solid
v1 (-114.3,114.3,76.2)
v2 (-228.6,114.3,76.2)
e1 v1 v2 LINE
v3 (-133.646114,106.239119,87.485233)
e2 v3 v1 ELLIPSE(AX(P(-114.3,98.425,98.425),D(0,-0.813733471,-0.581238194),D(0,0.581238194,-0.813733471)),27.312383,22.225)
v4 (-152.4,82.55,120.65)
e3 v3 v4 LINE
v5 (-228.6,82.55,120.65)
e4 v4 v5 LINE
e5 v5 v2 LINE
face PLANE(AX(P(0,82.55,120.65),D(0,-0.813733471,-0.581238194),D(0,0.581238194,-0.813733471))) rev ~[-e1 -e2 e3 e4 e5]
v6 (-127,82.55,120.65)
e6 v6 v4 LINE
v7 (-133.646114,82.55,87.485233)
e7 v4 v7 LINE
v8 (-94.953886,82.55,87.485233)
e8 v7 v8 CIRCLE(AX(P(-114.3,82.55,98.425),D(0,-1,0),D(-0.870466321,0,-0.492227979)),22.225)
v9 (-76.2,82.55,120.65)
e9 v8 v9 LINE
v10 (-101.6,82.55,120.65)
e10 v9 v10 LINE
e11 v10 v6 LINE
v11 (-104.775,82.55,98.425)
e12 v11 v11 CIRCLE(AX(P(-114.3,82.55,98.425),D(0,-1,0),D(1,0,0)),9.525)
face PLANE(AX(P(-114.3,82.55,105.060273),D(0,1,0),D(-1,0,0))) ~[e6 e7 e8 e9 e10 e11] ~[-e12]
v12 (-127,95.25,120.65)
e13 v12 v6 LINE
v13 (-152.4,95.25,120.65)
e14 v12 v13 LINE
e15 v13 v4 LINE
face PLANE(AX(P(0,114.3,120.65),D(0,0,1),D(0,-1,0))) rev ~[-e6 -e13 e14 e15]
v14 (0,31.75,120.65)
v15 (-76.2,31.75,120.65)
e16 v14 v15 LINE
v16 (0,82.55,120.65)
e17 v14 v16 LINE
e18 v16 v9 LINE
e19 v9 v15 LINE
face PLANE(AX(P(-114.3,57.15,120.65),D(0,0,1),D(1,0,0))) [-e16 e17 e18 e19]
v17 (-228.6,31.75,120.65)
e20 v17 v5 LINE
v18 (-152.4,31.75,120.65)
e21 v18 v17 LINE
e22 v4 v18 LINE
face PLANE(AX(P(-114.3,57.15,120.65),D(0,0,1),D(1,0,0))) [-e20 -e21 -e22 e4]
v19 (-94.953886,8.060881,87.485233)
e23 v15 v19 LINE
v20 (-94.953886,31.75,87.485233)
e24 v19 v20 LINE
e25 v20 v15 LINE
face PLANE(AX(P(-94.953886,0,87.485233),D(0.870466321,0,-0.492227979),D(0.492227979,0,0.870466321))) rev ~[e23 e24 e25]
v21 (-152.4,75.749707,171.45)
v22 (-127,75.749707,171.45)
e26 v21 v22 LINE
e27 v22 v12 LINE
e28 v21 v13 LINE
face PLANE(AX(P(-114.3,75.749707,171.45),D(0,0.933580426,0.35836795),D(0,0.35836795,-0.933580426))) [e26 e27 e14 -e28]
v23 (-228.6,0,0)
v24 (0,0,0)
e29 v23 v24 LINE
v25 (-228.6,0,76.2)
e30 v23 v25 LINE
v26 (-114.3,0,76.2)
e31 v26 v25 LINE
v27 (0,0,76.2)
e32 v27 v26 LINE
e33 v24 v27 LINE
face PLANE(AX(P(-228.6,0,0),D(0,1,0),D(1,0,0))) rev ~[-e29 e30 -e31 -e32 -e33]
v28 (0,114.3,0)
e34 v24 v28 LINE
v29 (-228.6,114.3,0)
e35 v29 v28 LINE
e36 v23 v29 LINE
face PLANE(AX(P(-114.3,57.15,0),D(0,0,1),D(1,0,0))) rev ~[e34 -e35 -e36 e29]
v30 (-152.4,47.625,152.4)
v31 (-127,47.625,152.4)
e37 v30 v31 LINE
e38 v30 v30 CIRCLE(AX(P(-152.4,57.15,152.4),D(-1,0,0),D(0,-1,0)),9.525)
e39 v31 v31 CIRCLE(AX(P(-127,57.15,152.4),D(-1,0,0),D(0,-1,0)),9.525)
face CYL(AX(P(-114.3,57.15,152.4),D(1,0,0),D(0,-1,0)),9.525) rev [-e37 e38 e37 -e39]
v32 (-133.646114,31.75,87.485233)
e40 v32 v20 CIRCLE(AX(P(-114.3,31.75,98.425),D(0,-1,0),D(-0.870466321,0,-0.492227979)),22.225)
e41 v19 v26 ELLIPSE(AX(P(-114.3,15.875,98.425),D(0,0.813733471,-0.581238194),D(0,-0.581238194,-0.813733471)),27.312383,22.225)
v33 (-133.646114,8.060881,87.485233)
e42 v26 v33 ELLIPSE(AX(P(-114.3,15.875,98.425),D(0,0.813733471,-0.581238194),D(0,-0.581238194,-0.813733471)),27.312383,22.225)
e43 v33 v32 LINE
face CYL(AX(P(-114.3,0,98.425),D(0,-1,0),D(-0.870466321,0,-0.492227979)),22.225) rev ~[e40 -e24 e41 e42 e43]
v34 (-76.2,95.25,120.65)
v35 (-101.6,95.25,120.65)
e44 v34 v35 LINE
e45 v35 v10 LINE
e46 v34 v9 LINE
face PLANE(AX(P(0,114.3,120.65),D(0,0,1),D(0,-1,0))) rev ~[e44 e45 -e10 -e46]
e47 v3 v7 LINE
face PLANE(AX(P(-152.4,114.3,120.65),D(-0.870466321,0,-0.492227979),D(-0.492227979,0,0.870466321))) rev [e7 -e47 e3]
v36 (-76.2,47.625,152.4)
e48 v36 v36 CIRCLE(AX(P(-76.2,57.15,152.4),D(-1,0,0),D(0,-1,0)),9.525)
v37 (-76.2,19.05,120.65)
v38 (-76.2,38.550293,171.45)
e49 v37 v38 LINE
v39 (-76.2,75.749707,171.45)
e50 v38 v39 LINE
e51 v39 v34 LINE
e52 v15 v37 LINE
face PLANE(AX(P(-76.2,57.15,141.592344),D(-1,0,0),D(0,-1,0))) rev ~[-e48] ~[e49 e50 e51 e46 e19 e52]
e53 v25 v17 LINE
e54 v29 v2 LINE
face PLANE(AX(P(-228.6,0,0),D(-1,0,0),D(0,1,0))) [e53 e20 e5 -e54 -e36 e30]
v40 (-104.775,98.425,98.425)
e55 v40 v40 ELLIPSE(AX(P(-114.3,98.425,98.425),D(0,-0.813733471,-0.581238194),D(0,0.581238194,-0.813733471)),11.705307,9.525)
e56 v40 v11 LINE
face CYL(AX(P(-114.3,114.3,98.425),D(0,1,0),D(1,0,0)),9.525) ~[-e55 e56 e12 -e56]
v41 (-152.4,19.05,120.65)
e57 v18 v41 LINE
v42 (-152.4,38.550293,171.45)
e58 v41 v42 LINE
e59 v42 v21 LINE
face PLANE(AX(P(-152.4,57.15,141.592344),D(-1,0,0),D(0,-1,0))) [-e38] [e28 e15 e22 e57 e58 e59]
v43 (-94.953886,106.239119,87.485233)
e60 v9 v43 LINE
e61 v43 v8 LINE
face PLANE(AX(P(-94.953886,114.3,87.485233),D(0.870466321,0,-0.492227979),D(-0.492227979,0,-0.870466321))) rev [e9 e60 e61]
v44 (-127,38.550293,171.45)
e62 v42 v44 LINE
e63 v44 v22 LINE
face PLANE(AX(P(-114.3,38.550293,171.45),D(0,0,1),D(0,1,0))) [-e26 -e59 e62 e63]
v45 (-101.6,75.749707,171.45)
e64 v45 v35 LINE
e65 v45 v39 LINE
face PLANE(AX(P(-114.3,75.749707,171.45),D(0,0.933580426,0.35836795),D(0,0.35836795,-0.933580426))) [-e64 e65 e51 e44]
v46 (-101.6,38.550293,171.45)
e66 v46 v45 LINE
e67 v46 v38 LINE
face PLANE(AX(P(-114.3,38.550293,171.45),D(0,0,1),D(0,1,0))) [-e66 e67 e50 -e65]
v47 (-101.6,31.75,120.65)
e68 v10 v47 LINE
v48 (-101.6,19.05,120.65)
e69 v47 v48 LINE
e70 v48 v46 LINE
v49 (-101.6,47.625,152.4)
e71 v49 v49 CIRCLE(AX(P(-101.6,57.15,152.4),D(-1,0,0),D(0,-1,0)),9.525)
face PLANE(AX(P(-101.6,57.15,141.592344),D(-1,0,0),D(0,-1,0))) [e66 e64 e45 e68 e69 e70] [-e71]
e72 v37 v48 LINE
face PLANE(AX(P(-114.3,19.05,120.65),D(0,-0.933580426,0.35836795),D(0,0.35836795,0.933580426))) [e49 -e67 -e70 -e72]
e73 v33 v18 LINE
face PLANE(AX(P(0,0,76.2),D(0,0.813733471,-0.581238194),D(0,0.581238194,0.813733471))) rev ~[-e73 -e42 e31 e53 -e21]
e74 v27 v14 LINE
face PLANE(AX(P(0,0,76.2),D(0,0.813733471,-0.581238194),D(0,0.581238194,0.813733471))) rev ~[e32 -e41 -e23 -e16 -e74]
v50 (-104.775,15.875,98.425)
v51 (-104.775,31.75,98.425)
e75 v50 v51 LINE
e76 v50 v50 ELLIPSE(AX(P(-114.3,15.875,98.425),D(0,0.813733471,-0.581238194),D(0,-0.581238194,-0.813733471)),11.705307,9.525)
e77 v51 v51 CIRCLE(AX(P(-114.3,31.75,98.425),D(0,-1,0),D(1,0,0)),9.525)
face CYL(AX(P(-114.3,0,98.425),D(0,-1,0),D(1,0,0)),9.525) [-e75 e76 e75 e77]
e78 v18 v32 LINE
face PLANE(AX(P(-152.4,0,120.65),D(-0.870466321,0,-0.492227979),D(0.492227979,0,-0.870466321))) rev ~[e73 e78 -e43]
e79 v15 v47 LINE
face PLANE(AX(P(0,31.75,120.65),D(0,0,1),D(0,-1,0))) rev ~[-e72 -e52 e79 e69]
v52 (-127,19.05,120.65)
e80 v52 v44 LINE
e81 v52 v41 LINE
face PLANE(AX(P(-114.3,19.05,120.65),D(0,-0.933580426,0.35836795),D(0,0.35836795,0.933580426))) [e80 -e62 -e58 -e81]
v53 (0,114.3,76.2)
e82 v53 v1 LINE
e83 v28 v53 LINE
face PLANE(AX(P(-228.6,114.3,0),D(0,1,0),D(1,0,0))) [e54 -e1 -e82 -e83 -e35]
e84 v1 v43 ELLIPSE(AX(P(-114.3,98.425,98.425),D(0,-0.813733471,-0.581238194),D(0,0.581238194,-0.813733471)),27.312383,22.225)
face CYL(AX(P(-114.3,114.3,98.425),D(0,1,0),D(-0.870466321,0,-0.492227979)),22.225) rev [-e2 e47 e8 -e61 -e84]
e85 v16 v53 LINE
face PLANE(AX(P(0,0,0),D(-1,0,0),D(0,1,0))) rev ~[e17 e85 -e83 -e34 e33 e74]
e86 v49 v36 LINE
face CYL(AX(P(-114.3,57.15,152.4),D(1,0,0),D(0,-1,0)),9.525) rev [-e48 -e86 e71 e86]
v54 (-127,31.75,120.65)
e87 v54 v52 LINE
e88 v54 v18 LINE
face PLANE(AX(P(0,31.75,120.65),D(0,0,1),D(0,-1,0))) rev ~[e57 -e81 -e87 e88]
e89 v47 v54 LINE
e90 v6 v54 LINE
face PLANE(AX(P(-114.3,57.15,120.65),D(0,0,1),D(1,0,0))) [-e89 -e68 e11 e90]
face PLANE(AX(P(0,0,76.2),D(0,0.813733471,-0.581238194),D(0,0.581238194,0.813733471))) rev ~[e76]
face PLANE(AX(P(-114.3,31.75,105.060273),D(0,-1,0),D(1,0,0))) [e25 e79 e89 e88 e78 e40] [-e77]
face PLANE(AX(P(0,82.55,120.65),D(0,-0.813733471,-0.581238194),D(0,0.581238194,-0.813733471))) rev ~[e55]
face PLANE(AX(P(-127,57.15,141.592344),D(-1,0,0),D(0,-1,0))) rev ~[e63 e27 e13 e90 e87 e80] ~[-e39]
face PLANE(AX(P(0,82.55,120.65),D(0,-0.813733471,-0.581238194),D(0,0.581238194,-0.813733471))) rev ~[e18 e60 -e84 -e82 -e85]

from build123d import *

# Parameters (mm, degrees)
F0_W      = 228.6
F0_H      = 114.3
F1_DEPTH  = 120.65
F6_R      = 9.525
F7_DEPTH  = 38.1
F8_DEPTH  = 12.7
F10_DEPTH = 228.6
F11_R     = 9.525
F12_DEPTH = 31.75


# Not quite as in the source:
# - a pattern or mirror of a feature is missing from the dataset's text; its kind, count and spacing are read off the source's solid


with BuildPart() as f1:
    # F0 (on Top) → F1 (new body)
    with BuildSketch(Plane.XY):
        with Locations((-114.3, 57.15)):
            Rectangle(F0_W, F0_H)
    extrude(amount=F1_DEPTH)

    # F6 (on 3pt) → F7 (join, symmetric)
    with BuildSketch(Plane(origin=(-114.3, 0, 0), x_dir=(0, -1, 0), z_dir=(-1, 0, 0))):
        Polygon((-75.7497070202, 171.45), (-95.25, 120.65), (-19.05, 120.65), (-38.5502929798, 171.45), align=None)
        with Locations((-57.15, 152.4)):
            Circle(F6_R, mode=Mode.SUBTRACT)
    extrude(amount=F7_DEPTH, both=True)

    # F6 (on 3pt) → F8 (cut, symmetric)
    with BuildSketch(Plane(origin=(-114.3, 0, 0), x_dir=(0, -1, 0), z_dir=(-1, 0, 0))):
        Polygon((-75.7497070202, 171.45), (-95.25, 120.65), (-19.05, 120.65), (-38.5502929798, 171.45), align=None)
        with Locations((-57.15, 152.4)):
            Circle(F6_R, mode=Mode.SUBTRACT)
    extrude(amount=F8_DEPTH, both=True, mode=Mode.SUBTRACT)

    # F9 (on face) → F10 (cut, through all)
    with BuildSketch(Plane.YZ):
        Polygon((31.75, 120.65), (0, 120.65), (0, 76.2), align=None)
        Polygon((114.3, 120.65), (82.55, 120.65), (114.3, 76.2), align=None)
    extrude(amount=-F10_DEPTH, mode=Mode.SUBTRACT)

    # F11 (on face) → F12 (cut)
    with BuildSketch(Plane.XZ):
        with BuildLine():
            Line((-152.4, 120.65), (-133.6461139863, 87.4852331607))
            ThreePointArc((-133.6461139892, 87.4852331591), (-114.3000000002, 76.2), (-94.9538860115, 87.4852331593))
            Line((-94.9538860135, 87.4852331605), (-76.2, 120.65))
            Line((-76.2, 120.65), (-152.4, 120.65))
        make_face()
        with Locations((-114.3000000004, 98.425)):
            Circle(F11_R, mode=Mode.SUBTRACT)
    f12 = extrude(amount=-F12_DEPTH, mode=Mode.SUBTRACT)

    # F12_copies: F12 across plane
    add(f12.mirror(Plane.ZX.offset(57.15)), mode=Mode.SUBTRACT)


solid = f1.part
